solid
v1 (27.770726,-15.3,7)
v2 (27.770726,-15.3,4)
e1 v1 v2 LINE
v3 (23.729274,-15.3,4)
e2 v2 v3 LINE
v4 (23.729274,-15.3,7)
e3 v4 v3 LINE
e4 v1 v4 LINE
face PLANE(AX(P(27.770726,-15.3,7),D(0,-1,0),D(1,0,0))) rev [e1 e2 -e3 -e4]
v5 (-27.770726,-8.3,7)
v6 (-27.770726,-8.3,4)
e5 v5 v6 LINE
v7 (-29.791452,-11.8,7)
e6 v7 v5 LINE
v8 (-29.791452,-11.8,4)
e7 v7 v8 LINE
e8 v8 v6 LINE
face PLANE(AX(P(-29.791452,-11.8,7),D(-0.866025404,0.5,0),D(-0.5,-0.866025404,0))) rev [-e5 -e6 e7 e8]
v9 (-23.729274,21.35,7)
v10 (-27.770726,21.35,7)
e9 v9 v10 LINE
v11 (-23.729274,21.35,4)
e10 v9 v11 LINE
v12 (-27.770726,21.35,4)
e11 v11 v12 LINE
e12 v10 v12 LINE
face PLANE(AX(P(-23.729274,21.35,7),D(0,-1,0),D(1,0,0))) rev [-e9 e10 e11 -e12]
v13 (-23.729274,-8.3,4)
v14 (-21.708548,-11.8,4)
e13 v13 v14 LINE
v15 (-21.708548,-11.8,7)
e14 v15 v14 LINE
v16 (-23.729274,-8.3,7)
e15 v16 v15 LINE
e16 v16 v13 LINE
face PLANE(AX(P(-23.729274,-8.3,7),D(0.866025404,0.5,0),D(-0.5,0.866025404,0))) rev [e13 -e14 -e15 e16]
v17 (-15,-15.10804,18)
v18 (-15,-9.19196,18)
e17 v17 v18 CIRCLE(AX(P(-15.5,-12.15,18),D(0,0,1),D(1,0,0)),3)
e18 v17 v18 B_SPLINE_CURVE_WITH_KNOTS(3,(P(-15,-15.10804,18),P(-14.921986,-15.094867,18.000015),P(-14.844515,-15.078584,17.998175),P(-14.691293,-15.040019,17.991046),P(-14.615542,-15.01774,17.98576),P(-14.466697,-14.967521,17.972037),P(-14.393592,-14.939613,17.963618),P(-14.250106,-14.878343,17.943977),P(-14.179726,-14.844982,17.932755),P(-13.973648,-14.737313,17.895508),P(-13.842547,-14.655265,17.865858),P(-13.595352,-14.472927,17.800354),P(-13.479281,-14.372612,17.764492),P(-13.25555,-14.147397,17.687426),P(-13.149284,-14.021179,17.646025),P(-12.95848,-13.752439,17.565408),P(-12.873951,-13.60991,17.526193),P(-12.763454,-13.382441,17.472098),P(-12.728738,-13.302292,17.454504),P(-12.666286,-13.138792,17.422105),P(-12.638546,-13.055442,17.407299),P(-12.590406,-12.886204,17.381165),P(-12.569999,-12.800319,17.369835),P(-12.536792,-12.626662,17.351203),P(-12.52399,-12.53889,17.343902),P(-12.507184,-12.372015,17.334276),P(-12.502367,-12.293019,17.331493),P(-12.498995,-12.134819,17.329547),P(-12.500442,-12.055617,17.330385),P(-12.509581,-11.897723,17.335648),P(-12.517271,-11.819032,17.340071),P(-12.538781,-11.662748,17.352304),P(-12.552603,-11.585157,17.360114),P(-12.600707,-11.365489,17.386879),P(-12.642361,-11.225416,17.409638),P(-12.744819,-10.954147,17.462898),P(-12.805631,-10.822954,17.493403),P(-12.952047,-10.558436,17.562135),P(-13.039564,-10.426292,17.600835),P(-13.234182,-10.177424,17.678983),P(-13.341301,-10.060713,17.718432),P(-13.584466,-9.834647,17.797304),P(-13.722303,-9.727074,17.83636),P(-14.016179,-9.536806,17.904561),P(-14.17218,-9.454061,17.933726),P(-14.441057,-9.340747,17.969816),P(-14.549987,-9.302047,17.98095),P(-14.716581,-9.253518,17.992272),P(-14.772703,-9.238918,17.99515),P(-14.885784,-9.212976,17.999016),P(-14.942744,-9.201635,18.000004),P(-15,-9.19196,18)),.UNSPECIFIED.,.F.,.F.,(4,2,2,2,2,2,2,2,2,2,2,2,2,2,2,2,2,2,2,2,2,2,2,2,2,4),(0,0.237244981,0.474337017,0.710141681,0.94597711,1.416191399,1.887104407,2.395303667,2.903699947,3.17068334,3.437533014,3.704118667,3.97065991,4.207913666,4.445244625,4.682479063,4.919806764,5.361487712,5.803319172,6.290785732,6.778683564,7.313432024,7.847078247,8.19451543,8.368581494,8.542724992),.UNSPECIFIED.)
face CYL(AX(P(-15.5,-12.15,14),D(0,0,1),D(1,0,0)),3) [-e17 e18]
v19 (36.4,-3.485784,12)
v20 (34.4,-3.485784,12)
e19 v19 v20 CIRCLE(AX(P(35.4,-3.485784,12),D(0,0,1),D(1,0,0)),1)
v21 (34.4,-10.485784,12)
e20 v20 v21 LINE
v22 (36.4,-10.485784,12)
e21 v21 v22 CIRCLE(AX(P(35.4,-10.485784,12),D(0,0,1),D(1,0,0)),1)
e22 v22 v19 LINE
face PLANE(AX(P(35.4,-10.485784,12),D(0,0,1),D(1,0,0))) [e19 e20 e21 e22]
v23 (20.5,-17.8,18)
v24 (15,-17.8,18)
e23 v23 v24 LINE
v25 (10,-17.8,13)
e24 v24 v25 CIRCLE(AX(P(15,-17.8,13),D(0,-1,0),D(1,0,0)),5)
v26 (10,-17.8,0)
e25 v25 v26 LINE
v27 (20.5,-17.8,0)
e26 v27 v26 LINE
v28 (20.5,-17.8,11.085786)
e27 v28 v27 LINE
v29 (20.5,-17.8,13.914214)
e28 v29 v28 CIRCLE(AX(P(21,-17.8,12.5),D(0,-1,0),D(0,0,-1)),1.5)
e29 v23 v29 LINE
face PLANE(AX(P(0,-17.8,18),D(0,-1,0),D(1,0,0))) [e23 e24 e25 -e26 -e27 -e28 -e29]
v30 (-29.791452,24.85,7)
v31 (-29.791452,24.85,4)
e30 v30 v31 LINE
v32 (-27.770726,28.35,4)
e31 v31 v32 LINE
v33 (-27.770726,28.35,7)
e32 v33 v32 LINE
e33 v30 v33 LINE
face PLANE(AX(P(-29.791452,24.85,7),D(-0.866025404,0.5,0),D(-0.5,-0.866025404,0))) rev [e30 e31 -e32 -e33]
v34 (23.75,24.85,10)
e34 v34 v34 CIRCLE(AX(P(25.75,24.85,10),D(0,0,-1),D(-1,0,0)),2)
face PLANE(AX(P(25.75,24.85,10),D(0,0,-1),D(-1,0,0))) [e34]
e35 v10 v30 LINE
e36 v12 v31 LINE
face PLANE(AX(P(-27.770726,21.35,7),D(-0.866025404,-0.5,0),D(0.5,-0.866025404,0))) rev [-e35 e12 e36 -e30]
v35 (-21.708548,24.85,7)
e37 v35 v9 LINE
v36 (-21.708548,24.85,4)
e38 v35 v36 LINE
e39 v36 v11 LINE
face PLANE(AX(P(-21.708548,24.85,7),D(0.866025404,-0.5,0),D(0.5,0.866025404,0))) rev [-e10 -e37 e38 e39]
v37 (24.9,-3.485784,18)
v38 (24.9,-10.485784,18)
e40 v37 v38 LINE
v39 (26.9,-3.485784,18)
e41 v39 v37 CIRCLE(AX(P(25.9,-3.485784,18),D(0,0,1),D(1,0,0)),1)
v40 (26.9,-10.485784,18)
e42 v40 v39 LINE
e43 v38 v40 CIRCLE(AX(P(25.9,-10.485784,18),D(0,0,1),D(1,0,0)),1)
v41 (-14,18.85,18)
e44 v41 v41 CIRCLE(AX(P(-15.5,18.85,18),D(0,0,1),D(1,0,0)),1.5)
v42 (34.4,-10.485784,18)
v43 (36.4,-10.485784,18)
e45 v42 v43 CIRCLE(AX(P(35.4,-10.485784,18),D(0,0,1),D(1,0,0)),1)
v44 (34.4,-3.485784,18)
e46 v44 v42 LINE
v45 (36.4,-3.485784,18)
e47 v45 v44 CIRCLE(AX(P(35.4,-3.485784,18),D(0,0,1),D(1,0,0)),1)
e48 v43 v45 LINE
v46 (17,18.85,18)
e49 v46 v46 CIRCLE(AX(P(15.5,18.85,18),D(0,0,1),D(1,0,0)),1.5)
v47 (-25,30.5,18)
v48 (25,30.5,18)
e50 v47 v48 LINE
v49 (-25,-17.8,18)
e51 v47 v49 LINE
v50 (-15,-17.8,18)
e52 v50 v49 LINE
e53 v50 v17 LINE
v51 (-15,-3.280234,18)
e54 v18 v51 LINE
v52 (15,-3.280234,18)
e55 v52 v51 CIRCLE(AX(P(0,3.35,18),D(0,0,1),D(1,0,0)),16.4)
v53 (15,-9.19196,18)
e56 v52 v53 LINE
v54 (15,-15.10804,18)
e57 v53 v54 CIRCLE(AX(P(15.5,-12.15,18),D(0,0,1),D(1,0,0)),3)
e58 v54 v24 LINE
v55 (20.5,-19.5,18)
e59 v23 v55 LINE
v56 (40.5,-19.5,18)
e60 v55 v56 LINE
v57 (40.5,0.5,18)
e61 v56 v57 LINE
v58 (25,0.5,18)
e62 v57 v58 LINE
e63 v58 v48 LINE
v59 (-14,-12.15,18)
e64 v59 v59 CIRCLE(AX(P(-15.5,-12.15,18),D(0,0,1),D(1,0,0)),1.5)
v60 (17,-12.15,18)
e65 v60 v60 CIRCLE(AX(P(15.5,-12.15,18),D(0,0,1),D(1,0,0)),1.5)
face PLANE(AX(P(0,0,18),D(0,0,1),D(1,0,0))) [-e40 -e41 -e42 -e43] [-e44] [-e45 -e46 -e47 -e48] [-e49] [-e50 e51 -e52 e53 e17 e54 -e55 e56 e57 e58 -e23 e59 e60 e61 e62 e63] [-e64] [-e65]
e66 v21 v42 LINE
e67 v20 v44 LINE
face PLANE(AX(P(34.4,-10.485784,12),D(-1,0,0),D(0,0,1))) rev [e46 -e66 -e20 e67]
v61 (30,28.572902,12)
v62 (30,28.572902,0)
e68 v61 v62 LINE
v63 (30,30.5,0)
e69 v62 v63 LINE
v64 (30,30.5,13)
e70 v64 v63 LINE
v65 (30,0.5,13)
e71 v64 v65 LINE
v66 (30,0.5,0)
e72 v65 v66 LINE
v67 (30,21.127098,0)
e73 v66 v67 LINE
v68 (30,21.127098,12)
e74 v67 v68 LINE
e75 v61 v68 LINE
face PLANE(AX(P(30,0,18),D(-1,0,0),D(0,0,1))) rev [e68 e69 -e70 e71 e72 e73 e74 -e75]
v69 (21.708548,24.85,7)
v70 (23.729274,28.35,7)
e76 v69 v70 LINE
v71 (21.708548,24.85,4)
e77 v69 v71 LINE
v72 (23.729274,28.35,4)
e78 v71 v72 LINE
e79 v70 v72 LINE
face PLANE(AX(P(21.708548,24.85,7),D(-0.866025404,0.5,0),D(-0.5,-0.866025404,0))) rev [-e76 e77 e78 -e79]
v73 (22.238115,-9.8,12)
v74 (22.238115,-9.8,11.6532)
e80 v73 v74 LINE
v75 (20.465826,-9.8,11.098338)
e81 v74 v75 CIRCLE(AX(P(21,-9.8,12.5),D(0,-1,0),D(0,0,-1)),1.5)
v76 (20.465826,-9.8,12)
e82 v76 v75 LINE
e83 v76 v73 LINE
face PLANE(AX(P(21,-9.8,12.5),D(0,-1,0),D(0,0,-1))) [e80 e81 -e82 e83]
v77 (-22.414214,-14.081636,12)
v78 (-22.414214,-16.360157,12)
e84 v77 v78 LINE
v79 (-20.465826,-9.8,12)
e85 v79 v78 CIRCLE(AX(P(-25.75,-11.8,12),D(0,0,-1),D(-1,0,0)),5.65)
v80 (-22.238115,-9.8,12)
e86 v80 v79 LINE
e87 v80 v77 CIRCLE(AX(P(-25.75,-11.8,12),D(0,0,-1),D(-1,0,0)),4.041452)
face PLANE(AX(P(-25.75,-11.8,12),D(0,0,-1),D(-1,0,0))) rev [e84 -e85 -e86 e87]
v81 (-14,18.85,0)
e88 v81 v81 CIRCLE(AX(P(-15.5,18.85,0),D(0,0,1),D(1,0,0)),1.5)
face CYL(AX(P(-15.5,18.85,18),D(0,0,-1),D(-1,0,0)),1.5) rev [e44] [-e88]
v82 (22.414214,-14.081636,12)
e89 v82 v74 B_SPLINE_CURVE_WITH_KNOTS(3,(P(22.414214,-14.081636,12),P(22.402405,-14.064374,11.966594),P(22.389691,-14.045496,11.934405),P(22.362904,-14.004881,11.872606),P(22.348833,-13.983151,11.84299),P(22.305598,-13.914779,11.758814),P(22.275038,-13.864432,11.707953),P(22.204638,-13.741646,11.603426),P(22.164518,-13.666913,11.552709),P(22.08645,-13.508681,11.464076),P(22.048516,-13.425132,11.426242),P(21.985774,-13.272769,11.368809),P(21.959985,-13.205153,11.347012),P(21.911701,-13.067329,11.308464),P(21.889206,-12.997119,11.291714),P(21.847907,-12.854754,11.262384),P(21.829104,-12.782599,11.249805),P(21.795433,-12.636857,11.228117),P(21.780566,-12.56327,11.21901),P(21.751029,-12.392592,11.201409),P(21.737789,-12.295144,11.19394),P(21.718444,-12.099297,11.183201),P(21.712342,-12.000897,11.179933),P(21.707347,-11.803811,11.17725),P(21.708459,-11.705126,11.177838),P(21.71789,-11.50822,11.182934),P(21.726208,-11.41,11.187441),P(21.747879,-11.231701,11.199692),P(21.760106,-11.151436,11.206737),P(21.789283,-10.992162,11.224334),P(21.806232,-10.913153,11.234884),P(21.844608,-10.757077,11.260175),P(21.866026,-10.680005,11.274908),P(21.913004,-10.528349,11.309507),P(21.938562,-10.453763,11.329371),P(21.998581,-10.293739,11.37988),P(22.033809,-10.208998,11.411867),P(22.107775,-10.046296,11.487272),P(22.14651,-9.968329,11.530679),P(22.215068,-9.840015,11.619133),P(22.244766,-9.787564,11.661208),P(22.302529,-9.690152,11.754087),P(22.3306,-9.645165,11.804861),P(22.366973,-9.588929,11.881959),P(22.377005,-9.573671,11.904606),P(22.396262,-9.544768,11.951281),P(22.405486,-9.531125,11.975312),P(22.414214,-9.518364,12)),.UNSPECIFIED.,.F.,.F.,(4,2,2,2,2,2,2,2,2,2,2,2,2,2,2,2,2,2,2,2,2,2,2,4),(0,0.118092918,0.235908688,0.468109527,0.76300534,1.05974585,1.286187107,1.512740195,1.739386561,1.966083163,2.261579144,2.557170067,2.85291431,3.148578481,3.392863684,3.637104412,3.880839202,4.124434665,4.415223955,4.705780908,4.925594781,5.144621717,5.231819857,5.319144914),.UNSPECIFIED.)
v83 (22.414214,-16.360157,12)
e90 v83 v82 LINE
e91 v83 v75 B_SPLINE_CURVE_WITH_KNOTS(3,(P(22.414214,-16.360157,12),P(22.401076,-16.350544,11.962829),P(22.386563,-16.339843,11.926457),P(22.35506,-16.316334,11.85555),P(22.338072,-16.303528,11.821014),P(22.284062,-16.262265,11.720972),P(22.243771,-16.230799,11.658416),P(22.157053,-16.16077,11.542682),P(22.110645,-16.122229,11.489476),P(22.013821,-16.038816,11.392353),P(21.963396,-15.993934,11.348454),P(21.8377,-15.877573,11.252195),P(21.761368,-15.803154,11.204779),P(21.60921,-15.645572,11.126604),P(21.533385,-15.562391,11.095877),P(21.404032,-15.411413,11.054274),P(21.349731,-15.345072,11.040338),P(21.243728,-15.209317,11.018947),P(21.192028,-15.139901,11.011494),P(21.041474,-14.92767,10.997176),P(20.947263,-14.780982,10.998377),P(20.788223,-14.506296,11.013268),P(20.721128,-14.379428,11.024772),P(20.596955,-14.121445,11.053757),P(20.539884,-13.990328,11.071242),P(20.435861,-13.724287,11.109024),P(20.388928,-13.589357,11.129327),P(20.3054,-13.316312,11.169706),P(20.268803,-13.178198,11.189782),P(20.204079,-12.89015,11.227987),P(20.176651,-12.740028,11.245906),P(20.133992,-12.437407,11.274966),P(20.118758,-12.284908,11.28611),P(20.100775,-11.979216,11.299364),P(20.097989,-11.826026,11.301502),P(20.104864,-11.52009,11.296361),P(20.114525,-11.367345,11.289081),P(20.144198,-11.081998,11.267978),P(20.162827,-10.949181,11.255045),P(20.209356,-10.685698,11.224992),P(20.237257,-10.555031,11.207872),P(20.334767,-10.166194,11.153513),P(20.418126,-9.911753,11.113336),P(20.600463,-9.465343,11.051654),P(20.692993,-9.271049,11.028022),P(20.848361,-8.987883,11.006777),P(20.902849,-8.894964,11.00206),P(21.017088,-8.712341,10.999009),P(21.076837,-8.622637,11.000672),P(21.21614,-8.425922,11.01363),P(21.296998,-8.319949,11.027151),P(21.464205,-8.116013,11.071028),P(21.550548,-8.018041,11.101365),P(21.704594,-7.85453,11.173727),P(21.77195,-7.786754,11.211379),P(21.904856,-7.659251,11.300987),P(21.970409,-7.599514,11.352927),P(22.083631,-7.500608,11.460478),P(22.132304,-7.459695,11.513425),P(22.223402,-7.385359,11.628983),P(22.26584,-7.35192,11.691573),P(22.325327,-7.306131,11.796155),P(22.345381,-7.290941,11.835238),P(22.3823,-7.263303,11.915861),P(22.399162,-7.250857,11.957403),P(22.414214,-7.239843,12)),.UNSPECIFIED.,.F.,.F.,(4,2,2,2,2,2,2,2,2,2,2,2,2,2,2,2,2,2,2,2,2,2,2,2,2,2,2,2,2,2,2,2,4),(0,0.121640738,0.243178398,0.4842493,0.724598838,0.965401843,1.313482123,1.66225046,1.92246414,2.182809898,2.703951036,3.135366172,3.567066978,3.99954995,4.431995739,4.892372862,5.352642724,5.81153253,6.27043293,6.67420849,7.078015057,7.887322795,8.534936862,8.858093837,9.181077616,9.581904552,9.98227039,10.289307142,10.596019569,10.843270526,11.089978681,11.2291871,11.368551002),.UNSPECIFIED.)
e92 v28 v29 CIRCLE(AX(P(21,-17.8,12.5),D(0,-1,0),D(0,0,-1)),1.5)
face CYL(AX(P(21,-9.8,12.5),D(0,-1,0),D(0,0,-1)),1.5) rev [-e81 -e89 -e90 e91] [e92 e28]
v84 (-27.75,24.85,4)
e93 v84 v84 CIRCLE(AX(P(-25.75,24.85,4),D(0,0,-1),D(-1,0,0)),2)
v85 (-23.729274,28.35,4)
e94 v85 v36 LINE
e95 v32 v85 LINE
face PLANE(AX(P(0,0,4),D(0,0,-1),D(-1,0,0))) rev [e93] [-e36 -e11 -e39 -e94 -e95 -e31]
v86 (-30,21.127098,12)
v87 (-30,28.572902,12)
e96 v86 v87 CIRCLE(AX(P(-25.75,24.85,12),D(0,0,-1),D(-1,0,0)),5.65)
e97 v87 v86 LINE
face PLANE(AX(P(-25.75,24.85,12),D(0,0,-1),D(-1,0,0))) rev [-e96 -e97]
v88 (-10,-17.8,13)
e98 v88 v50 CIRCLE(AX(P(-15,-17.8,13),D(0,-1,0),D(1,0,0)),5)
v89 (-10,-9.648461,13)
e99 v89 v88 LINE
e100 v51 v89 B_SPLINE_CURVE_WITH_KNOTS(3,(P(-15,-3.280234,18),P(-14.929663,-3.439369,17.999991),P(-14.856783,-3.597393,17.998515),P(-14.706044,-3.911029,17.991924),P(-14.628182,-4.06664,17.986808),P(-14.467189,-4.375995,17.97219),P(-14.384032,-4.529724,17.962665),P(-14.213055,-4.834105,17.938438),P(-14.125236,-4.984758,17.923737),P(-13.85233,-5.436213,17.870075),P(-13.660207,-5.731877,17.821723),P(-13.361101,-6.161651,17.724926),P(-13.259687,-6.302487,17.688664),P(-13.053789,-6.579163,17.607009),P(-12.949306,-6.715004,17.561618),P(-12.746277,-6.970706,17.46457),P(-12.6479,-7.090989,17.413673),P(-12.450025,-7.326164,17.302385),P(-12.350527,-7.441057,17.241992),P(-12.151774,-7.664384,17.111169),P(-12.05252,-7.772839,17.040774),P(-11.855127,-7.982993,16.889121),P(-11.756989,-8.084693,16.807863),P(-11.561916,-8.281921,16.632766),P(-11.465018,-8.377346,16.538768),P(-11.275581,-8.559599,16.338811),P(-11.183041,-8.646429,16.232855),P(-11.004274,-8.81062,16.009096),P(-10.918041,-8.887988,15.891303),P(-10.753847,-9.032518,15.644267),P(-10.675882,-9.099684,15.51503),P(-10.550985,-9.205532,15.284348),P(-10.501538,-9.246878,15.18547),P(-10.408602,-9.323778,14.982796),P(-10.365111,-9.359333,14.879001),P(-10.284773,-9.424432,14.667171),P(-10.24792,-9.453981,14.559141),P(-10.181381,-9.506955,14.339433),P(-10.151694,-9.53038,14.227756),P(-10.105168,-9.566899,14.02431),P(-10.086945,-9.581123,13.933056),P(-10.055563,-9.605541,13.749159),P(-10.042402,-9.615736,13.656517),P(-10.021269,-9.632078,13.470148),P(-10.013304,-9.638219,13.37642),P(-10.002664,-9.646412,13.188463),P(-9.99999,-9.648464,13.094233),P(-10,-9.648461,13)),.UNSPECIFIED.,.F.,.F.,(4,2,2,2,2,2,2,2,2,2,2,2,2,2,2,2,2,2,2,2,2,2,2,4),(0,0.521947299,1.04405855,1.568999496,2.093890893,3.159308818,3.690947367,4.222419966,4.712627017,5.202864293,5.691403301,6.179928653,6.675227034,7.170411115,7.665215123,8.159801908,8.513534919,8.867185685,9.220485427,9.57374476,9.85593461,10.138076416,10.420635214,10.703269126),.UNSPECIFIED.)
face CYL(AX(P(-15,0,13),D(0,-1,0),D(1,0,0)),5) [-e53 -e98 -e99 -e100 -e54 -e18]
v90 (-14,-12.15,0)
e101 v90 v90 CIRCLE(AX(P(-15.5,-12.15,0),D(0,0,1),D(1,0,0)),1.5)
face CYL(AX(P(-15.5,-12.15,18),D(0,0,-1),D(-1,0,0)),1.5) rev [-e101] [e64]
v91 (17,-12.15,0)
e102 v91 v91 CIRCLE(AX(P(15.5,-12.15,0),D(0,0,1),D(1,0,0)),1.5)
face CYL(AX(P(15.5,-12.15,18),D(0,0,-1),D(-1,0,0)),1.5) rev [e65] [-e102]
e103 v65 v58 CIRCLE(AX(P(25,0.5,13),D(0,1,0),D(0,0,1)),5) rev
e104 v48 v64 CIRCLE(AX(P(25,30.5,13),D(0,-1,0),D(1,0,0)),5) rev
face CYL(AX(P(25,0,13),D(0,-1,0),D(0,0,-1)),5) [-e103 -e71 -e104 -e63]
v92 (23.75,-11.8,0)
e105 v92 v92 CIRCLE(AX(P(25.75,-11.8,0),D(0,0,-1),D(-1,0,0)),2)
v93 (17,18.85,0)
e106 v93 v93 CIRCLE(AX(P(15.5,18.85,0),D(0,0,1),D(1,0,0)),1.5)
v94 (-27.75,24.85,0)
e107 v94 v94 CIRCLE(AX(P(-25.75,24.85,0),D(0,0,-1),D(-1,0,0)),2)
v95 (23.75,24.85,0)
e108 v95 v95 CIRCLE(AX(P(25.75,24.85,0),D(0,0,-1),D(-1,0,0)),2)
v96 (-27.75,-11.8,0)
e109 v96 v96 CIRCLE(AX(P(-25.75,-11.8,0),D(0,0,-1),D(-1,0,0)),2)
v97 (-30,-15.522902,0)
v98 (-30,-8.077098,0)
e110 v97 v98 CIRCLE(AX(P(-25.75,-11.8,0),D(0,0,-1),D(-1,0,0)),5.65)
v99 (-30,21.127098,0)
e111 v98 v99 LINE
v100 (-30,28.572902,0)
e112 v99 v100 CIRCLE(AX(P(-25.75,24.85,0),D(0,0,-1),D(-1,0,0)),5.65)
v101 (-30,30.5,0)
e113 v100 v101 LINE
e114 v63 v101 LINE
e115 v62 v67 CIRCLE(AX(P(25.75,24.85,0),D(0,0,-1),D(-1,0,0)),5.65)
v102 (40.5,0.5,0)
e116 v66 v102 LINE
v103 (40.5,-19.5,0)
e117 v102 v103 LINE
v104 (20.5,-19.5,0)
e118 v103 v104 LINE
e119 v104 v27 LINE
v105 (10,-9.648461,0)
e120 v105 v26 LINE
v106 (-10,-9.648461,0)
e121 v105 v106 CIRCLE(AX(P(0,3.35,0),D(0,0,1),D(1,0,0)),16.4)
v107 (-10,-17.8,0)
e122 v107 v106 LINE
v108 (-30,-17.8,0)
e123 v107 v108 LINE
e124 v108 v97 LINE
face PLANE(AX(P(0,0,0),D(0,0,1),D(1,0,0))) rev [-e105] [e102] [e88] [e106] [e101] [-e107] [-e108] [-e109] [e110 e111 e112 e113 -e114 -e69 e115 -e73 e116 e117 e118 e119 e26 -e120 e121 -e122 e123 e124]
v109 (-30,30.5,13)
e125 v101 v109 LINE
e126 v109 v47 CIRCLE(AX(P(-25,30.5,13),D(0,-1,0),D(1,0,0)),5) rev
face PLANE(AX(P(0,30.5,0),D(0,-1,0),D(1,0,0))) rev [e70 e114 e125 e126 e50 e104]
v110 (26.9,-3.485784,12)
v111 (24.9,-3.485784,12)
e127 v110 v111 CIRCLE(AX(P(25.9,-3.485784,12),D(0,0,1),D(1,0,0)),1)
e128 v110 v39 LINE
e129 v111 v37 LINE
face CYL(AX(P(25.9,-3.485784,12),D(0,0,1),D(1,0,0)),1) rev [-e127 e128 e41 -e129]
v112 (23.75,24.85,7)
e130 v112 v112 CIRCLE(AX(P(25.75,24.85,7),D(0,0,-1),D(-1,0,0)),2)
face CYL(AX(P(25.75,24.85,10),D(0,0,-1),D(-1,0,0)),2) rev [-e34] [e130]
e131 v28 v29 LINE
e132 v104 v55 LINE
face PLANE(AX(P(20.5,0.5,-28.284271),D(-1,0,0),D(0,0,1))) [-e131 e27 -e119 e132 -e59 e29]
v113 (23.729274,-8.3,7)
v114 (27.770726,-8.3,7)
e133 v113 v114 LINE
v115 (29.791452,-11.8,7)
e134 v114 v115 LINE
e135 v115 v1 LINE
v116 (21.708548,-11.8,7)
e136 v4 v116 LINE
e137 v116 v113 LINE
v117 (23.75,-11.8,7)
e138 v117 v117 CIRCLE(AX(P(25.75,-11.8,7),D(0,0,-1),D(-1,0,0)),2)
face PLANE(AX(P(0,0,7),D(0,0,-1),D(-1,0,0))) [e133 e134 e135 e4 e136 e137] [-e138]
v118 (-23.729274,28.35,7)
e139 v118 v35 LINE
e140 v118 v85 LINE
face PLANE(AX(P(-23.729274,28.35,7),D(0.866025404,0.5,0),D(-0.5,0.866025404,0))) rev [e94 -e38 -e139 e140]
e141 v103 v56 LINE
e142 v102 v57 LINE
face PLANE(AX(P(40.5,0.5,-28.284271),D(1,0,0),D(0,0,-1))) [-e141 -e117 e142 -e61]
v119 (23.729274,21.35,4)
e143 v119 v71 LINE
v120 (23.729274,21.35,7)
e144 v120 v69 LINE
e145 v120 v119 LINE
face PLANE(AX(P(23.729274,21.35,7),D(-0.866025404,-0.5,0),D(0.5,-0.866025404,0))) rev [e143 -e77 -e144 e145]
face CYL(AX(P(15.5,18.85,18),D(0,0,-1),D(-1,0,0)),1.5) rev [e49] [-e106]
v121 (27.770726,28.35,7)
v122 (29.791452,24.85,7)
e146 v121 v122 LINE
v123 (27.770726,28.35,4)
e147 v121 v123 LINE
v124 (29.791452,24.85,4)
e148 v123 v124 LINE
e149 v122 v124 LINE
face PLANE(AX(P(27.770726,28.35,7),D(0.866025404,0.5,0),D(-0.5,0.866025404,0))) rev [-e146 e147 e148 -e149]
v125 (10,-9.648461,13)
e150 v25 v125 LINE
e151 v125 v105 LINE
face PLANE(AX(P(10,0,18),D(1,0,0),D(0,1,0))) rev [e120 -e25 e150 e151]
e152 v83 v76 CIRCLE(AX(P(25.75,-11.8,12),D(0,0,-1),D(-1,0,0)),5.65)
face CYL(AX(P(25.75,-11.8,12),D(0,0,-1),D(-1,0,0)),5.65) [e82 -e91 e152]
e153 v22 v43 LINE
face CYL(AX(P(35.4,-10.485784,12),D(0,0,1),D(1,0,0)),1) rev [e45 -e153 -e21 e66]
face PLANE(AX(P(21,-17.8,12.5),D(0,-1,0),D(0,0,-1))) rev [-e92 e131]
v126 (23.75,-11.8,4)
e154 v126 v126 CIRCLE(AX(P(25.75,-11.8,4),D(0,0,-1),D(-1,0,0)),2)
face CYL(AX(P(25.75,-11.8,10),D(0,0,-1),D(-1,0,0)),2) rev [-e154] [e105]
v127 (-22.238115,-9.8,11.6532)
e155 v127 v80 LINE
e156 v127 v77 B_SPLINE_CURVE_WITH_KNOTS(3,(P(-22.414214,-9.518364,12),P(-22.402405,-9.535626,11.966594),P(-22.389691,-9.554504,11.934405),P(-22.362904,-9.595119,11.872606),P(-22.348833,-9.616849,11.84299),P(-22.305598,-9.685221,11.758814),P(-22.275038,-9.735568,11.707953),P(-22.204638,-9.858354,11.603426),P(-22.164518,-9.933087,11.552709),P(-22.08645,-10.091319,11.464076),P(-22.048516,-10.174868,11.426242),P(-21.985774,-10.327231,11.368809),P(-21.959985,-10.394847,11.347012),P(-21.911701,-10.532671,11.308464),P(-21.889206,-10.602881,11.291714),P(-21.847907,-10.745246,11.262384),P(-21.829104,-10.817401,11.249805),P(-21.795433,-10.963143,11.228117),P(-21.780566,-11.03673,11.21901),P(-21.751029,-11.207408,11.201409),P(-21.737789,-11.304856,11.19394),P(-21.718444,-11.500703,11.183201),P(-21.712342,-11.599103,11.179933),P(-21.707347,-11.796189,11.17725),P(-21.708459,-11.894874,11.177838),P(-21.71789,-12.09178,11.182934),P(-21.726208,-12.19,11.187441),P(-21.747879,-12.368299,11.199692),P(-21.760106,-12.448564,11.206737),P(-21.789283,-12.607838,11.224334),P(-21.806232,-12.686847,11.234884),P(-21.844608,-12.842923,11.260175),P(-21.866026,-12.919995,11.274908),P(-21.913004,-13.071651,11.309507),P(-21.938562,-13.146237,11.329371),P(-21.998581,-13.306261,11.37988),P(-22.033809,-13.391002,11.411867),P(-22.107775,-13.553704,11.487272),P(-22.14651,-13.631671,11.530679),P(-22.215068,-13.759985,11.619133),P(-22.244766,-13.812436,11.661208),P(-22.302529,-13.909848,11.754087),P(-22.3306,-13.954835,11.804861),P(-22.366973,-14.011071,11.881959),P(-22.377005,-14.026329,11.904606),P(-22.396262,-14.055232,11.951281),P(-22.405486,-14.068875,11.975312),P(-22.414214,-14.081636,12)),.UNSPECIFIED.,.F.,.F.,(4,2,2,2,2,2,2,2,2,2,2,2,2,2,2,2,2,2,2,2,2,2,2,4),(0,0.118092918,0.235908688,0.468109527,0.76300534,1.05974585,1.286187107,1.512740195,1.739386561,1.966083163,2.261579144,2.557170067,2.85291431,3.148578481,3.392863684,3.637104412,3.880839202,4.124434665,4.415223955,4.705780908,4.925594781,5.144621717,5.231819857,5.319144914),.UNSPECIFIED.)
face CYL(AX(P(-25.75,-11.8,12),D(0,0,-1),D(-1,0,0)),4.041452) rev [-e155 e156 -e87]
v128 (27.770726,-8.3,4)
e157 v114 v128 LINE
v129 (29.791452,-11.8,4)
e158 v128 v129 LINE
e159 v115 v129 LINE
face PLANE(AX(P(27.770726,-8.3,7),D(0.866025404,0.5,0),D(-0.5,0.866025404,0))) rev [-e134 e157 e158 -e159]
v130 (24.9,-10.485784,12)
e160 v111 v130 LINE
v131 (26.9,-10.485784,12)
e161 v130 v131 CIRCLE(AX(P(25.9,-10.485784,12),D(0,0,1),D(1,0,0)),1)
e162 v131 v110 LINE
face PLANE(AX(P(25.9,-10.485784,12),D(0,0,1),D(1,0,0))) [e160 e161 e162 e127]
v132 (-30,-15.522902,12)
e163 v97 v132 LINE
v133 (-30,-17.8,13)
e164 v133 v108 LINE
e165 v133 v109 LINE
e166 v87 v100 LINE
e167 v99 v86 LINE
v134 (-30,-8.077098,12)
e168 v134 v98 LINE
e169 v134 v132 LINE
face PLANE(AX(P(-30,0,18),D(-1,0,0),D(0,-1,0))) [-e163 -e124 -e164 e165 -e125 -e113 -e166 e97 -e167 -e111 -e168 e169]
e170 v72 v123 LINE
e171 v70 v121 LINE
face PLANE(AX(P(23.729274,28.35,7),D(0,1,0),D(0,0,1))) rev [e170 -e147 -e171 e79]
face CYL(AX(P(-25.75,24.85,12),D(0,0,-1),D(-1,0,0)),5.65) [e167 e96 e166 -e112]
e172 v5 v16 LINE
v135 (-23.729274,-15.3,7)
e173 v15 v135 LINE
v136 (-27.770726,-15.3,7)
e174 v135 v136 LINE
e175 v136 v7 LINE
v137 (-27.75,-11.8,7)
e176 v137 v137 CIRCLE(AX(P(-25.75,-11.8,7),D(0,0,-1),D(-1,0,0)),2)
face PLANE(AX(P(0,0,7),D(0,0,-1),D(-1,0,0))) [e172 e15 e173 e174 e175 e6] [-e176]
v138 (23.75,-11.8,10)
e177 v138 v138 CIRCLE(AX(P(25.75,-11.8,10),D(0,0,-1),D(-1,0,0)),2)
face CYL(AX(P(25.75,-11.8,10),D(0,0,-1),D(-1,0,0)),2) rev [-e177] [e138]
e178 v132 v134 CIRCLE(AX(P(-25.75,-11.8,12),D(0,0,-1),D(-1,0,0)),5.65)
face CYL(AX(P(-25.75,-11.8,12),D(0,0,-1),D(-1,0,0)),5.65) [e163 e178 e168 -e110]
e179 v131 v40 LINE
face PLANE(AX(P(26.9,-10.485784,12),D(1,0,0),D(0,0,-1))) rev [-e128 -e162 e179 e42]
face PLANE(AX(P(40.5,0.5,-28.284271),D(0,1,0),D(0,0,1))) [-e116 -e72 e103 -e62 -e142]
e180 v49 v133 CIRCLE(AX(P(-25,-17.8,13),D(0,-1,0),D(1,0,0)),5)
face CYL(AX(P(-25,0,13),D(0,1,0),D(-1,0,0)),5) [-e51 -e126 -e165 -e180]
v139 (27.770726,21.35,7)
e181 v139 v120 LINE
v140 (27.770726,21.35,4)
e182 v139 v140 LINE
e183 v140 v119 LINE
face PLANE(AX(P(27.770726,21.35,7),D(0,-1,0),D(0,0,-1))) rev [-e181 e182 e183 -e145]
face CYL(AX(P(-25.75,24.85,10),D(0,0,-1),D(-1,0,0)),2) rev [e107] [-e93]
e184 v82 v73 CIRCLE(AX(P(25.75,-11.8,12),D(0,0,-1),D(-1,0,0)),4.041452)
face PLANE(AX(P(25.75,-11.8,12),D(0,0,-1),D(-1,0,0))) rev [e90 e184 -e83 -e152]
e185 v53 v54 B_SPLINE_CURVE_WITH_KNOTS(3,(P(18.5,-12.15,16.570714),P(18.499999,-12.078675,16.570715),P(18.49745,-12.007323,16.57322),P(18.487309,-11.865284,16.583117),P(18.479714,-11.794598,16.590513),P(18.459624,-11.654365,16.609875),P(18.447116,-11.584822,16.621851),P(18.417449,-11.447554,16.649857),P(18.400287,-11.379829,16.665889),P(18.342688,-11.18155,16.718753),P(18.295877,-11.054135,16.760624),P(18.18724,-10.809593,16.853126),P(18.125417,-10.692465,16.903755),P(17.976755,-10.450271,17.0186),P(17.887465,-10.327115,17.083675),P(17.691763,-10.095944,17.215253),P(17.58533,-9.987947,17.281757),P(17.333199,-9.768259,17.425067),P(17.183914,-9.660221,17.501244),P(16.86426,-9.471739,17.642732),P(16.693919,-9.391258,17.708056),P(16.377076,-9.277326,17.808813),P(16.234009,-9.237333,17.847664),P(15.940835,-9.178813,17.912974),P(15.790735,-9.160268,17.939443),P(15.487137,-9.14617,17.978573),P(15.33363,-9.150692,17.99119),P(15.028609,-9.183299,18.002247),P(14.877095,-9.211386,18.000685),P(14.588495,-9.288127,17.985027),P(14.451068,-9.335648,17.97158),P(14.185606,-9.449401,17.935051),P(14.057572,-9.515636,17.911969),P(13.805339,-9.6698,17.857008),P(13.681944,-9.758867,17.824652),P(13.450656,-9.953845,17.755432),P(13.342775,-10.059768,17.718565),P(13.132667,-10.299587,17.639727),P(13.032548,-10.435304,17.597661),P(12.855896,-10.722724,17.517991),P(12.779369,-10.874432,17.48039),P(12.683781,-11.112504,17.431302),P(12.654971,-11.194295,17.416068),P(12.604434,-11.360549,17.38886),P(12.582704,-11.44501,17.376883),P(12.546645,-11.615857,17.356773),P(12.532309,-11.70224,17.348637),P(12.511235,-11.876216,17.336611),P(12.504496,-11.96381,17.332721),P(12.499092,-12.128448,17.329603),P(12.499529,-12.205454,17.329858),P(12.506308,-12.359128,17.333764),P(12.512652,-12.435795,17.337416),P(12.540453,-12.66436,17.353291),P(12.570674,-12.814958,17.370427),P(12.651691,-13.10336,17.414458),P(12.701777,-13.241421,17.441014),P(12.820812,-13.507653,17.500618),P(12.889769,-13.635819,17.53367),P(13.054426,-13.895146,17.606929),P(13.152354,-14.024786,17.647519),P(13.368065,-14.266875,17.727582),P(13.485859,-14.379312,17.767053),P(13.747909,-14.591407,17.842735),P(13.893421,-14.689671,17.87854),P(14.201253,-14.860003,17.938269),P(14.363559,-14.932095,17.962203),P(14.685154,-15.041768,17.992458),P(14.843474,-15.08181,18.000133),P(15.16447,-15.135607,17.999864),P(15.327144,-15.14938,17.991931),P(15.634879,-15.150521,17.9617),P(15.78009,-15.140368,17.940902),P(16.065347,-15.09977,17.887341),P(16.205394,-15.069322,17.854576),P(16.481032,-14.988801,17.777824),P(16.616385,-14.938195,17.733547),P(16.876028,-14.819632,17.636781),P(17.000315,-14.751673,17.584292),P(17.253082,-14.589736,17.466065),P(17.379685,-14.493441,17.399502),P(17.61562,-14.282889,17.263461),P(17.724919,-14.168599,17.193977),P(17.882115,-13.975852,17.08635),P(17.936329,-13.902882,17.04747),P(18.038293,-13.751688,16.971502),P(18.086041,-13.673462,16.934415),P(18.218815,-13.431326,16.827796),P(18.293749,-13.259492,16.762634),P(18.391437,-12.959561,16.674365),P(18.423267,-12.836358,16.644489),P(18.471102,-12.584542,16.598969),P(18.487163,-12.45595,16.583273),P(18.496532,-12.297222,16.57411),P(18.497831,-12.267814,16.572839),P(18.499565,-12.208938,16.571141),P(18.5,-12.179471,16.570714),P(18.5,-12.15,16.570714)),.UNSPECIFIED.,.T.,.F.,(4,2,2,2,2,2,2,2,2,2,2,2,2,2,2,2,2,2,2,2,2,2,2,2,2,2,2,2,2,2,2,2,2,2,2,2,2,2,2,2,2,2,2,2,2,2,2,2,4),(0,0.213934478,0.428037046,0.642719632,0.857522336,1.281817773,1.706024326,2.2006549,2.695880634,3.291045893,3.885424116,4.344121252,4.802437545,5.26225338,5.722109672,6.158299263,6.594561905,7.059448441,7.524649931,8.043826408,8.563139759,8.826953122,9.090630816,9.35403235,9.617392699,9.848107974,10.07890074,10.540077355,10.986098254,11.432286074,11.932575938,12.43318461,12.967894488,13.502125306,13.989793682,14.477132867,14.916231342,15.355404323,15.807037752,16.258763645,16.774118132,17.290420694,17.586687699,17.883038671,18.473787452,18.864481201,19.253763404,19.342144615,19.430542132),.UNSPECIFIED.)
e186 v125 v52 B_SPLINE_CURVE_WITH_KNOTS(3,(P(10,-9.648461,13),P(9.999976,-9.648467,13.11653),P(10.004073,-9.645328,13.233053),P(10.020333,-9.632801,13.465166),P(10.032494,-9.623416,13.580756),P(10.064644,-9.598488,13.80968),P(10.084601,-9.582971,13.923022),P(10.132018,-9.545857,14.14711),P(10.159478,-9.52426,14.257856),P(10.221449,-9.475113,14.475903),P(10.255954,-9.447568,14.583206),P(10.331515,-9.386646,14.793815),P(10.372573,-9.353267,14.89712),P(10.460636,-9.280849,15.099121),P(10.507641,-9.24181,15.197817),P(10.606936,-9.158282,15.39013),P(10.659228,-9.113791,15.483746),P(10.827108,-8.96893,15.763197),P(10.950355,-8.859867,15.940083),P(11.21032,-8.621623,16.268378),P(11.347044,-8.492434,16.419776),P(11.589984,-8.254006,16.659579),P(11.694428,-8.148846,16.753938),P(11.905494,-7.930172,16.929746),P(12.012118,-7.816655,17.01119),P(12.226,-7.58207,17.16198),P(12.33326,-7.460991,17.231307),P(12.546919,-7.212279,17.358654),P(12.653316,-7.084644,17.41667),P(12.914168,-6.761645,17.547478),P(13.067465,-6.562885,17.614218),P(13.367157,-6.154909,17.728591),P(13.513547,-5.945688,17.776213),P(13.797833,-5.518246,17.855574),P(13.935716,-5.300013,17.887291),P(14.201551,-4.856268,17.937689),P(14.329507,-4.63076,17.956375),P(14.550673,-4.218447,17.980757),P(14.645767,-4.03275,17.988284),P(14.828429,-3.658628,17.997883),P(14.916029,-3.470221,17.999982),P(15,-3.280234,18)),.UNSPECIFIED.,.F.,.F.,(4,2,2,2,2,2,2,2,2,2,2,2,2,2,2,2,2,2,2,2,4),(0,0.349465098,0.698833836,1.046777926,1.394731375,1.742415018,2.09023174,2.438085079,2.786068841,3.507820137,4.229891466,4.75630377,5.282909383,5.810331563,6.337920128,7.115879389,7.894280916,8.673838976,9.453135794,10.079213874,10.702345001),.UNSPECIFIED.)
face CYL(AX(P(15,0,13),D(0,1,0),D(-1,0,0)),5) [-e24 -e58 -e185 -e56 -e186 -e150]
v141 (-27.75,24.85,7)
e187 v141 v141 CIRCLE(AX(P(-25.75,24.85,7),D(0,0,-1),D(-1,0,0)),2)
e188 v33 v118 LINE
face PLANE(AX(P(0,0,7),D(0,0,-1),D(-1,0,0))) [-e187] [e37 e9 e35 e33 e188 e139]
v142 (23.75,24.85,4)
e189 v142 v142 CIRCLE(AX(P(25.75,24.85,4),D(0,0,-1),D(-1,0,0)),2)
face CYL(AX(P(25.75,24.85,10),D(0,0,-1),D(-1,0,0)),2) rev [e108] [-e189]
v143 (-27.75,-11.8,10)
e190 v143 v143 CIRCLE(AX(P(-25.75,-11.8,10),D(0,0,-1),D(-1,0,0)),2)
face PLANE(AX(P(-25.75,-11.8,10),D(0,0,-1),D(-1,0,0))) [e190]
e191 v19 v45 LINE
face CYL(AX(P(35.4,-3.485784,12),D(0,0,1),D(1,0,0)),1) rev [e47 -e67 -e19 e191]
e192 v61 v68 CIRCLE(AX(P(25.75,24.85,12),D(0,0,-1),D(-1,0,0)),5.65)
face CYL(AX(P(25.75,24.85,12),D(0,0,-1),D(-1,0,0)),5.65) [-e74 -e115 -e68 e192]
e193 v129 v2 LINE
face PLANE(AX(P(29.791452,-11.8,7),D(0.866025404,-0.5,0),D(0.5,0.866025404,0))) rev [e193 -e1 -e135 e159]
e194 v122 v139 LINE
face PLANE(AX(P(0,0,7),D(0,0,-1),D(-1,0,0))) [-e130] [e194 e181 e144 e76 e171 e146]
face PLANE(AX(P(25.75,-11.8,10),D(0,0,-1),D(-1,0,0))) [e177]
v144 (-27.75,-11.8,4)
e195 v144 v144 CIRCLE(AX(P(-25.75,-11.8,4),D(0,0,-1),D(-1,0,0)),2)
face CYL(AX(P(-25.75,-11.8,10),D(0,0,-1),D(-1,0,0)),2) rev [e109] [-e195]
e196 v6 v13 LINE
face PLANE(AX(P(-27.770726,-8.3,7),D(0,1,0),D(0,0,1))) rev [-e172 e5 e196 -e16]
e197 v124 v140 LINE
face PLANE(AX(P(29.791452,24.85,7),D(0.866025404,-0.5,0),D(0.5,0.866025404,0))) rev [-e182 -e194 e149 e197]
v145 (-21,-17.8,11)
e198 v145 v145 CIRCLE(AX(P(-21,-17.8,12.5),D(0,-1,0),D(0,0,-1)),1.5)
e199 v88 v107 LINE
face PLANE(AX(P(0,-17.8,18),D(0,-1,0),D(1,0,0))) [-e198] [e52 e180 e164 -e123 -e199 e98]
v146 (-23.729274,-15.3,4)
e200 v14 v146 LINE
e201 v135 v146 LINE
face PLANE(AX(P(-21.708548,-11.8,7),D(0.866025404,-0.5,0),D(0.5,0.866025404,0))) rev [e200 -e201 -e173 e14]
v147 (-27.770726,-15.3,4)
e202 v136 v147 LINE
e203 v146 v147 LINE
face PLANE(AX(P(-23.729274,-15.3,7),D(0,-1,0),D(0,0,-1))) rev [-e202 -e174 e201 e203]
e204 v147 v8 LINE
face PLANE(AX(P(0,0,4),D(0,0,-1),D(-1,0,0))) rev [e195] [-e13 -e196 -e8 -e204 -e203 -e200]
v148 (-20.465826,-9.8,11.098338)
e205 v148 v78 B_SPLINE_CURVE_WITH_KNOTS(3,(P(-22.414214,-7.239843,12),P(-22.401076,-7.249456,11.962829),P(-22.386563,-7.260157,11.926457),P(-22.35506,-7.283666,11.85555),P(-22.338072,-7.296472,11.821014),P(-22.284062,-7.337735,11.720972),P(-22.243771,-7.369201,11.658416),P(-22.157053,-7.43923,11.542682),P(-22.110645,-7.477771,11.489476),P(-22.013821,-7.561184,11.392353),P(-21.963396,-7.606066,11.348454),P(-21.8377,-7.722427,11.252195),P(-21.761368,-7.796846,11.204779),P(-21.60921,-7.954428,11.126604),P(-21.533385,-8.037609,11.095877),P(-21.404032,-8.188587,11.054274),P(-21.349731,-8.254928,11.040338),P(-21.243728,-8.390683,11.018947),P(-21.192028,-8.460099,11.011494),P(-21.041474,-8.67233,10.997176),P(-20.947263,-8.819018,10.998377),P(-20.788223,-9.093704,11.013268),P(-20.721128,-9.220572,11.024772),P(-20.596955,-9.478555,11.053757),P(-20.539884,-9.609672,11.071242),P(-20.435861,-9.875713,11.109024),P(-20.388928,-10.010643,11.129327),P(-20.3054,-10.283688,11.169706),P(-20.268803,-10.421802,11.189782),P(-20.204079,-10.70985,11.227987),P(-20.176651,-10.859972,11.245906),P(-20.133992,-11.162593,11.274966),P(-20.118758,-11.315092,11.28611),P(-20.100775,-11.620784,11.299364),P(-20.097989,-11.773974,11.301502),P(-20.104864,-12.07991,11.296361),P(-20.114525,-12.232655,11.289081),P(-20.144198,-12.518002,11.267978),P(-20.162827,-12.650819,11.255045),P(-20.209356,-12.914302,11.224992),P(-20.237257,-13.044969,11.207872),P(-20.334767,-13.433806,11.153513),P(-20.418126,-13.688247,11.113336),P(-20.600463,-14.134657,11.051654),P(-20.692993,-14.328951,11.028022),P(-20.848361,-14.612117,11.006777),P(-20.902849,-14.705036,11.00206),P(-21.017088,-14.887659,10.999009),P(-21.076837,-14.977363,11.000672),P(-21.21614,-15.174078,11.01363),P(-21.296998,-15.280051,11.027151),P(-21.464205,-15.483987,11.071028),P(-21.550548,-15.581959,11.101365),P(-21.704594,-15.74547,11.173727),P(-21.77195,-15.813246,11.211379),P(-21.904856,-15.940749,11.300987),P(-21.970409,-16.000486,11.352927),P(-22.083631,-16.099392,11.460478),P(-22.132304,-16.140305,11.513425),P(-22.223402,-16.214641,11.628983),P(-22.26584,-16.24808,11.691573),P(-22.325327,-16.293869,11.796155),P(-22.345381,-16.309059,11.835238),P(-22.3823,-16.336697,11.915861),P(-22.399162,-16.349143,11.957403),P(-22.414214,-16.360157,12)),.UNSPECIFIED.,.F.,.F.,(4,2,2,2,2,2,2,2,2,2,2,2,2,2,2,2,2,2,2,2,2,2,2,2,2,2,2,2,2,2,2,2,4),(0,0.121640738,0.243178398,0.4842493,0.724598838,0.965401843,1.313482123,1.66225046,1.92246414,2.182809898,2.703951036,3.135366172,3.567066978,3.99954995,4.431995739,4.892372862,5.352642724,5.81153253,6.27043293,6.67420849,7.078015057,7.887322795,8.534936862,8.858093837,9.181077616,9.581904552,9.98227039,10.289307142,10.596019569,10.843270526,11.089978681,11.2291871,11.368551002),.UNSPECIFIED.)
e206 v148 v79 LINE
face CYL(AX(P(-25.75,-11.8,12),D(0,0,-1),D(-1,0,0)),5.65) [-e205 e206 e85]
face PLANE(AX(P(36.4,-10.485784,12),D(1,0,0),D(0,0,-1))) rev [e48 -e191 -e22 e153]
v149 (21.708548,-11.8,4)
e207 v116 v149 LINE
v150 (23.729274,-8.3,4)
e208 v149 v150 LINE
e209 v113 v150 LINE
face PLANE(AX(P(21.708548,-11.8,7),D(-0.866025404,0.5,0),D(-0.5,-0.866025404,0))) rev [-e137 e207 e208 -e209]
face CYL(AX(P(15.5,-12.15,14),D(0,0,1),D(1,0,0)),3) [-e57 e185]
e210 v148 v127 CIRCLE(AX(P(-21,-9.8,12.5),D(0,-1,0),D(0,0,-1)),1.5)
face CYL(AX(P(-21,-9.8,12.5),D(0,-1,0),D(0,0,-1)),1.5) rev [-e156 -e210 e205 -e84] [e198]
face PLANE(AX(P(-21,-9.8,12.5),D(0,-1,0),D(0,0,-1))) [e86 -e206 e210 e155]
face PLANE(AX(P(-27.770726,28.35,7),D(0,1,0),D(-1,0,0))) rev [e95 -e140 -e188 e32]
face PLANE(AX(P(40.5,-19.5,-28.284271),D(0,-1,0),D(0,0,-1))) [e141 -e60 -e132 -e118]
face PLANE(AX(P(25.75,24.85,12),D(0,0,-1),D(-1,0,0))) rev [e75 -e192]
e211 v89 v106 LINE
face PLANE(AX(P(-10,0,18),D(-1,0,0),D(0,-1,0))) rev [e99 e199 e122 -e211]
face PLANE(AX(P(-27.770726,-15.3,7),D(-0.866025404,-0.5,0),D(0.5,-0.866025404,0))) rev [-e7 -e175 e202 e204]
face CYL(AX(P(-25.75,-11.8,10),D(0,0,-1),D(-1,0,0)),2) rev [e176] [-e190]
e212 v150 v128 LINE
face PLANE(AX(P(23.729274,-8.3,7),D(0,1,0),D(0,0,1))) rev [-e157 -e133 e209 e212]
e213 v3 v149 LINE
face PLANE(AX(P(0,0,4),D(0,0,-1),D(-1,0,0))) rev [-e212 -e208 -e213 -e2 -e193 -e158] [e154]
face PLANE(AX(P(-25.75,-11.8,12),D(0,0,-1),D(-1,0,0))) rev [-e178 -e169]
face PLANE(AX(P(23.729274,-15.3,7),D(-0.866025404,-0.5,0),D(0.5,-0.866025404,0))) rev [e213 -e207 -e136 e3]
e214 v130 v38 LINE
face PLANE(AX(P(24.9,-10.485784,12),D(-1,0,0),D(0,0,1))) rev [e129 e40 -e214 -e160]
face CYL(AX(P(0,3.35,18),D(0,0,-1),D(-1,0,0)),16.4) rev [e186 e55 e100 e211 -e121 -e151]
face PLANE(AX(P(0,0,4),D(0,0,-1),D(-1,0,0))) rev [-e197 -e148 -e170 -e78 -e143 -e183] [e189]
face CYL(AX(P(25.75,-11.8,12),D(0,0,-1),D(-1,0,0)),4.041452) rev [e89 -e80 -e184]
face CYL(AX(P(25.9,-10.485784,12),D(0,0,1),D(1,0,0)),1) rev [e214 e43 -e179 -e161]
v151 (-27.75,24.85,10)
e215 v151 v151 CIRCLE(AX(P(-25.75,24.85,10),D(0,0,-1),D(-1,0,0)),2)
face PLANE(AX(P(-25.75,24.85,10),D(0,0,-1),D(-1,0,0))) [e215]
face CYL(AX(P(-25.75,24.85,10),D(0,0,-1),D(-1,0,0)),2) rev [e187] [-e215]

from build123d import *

# Parameters (mm, degrees)
SKETCH_1_R          = 1.5
EXTRUDE_1_DEPTH     = 18
SKETCH_9_W          = 60
SKETCH_9_H          = 18
EXTRUDE_4_DEPTH     = 6
FILLET_1_R          = 5
EXTRUDE_START       = -4
SKETCH_2_R          = 3
SKETCH_2_R_2        = 1.5
EXTRUDE_2_DEPTH     = 4
SKETCH_3_R          = 1.5
CUT_EXTRUDE_1_DEPTH = 8
EXTRUDE_3_REACH     = 48.414
SKETCH_5_W          = 20
SKETCH_5_H          = 20
SKETCH_6_R          = 1.5
CUT_EXTRUDE_6_DEPTH = 8
CUT_EXTRUDE_7_DEPTH = 6
CUT_EXTRUDE_START   = -4
CUT_EXTRUDE_8_DEPTH = 3
SKETCH_10_R         = 5.65
SKETCH_10_R_2       = 4.041451884
EXTRUDE_5_DEPTH     = 12
SKETCH_11_R         = 2
CUT_EXTRUDE_9_DEPTH = 10


with BuildPart() as part:
    # Эскиз1 → Бобышка-Вытянуть1 (new body)
    with BuildSketch(Plane.XY):
        with BuildLine():
            Line((10, -17.8), (30, -17.8))
            Line((30, -17.8), (30, 24.5))
            Line((30, 24.5), (-30, 24.5))
            Line((-30, 24.5), (-30, -17.8))
            Line((-30, -17.8), (-10, -17.8))
            Line((-10, -17.8), (-10, -9.648461447))
            ThreePointArc((-10, -9.648461447), (0, 19.75), (10, -9.648461447))
            Line((10, -9.648461447), (10, -17.8))
        make_face()
        with Locations((-15.5, -12.15)):
            Circle(SKETCH_1_R, mode=Mode.SUBTRACT)
        with Locations((15.5, -12.15)):
            Circle(SKETCH_1_R, mode=Mode.SUBTRACT)
        with Locations((-15.5, 18.85)):
            Circle(SKETCH_1_R, mode=Mode.SUBTRACT)
        with Locations((15.5, 18.85)):
            Circle(SKETCH_1_R, mode=Mode.SUBTRACT)
    extrude(amount=EXTRUDE_1_DEPTH)

    # Эскиз9 → Бобышка-Вытянуть4 (add)
    with BuildSketch(Plane(origin=(0, 24.5, 0), x_dir=(1, 0, 0), z_dir=(0, 1, 0))):
        with Locations((0, -9)):
            Rectangle(SKETCH_9_W, SKETCH_9_H)
    extrude(amount=EXTRUDE_4_DEPTH)

    # Скругление1
    # the kernel refuses this fillet: 5 mm, written as the material it takes off along each edge
    with BuildSketch(Plane(origin=(10, 2.851538553, 18), x_dir=(1, 0, 0), z_dir=(0, -1, 0)), Plane(origin=(-10, -30.3, 18), x_dir=(-1, 0, 0), z_dir=(0, 1, 0))) as fillet_1_piece_1:
        with BuildLine():
            CenterArc((FILLET_1_R, -FILLET_1_R), FILLET_1_R, 90, 90)
            Line((0, -FILLET_1_R), (0, 0))
            Line((0, 0), (FILLET_1_R, 0))
        make_face()
    extrude(amount=33.151538553, mode=Mode.SUBTRACT)
    with BuildSketch(Plane(origin=(30, -30.3, 18), x_dir=(-1, 0, 0), z_dir=(0, 1, 0)), Plane(origin=(-30, 43, 18), x_dir=(1, 0, 0), z_dir=(0, -1, 0))) as fillet_1_piece_2:
        with BuildLine():
            CenterArc((FILLET_1_R, -FILLET_1_R), FILLET_1_R, 90, 90)
            Line((0, -FILLET_1_R), (0, 0))
            Line((0, 0), (FILLET_1_R, 0))
        make_face()
    extrude(amount=73.3, mode=Mode.SUBTRACT)

    # Эскиз2 → Бобышка-Вытянуть2 (add)
    # profile 1 of 2: a face of its own
    with BuildSketch(Plane.XY.offset(18).offset(EXTRUDE_START)):
        with Locations((-15.5, -12.15)):
            Circle(SKETCH_2_R)
        with Locations((-15.5, -12.15)):
            Circle(SKETCH_2_R_2, mode=Mode.SUBTRACT)
    # profile 2 of 2: a face of its own
    with BuildSketch(Plane.XY.offset(18).offset(EXTRUDE_START)):
        with Locations((15.5, -12.15)):
            Circle(SKETCH_2_R)
        with Locations((15.5, -12.15)):
            Circle(SKETCH_2_R_2, mode=Mode.SUBTRACT)
    extrude(amount=EXTRUDE_2_DEPTH)

    # Эскиз3 → Вырез-Вытянуть1 (cut)
    with BuildSketch(Plane.XZ.offset(17.8)):
        with Locations(Location((-21, 12.5, 0), (0, 0, 270))):
            Circle(SKETCH_3_R)
        with Locations(Location((21, 12.5, 0), (0, 0, 270))):
            Circle(SKETCH_3_R)
    extrude(amount=-CUT_EXTRUDE_1_DEPTH, mode=Mode.SUBTRACT)

    # Бобышка-Вытянуть3: up to this face of the body (flat: up to its plane)
    extrude_3_end = Plane(part.part.faces().sort_by_distance((0, 20.520252556, 0))[0])
    # Эскиз5 → Бобышка-Вытянуть3 (add, up to the picked face)
    with BuildSketch(Plane.XY.offset(18), mode=Mode.PRIVATE) as extrude_3_sk1:
        with Locations((30.5, -9.5)):
            Rectangle(SKETCH_5_W, SKETCH_5_H)
    extrude_3_tool1 = split(extrude(extrude_3_sk1.sketch, amount=-EXTRUDE_3_REACH, mode=Mode.PRIVATE), bisect_by=extrude_3_end, keep=Keep.BOTH, mode=Mode.PRIVATE)
    add(extrude_3_tool1.solids().sort_by(Axis((30.5, -9.5, 18), (0, 0, -1)))[0])

    # Эскиз6 → Вырез-Вытянуть6 (cut)
    with BuildSketch(Plane.XZ.offset(17.8)):
        with Locations(Location((21, 12.5, 0), (0, 0, 270))):
            Circle(SKETCH_6_R)
    extrude(amount=-CUT_EXTRUDE_6_DEPTH, mode=Mode.SUBTRACT)

    # Эскиз7 → Вырез-Вытянуть7 (cut)
    with BuildSketch(Plane.XY.offset(18)):
        with BuildLine():
            Line((24.9, -10.485784196), (24.9, -3.485784196))
            ThreePointArc((24.9, -3.485784196), (25.9, -2.485784196), (26.9, -3.485784196))
            Line((26.9, -3.485784196), (26.9, -10.485784196))
            ThreePointArc((26.9, -10.485784196), (25.9, -11.485784196), (24.9, -10.485784196))
        make_face()
        with BuildLine():
            Line((34.4, -10.485784196), (34.4, -3.485784196))
            ThreePointArc((34.4, -3.485784196), (35.4, -2.485784196), (36.4, -3.485784196))
            Line((36.4, -3.485784196), (36.4, -10.485784196))
            ThreePointArc((36.4, -10.485784196), (35.4, -11.485784196), (34.4, -10.485784196))
        make_face()
    extrude(amount=-CUT_EXTRUDE_7_DEPTH, mode=Mode.SUBTRACT)

    # Эскиз8 → Вырез-Вытянуть8 (cut)
    with BuildSketch(Plane(origin=(0, 0, 0), x_dir=(-1, 0, 0), z_dir=(0, 0, -1)).offset(CUT_EXTRUDE_START)):
        Polygon((29.791451884, -11.8), (27.770725942, -8.3), (23.729274058, -8.3), (21.708548116, -11.8), (23.729274058, -15.3), (27.770725942, -15.3), align=None)
        Polygon((-21.708548116, -11.8), (-23.729274058, -8.3), (-27.770725942, -8.3), (-29.791451884, -11.8), (-27.770725942, -15.3), (-23.729274058, -15.3), align=None)
        Polygon((-21.708548116, 24.85), (-23.729274058, 28.35), (-27.770725942, 28.35), (-29.791451884, 24.85), (-27.770725942, 21.35), (-23.729274058, 21.35), align=None)
        Polygon((29.791451884, 24.85), (27.770725942, 28.35), (23.729274058, 28.35), (21.708548116, 24.85), (23.729274058, 21.35), (27.770725942, 21.35), align=None)
    extrude(amount=-CUT_EXTRUDE_8_DEPTH, mode=Mode.SUBTRACT)

    # Эскиз10 → Бобышка-Вытянуть5 (add)
    # profile 1 of 4: a face of its own
    with BuildSketch(Plane(origin=(0, 0, 0), x_dir=(-1, 0, 0), z_dir=(0, 0, -1))):
        with Locations((25.75, -11.8)):
            Circle(SKETCH_10_R)
        with Locations((25.75, -11.8)):
            Circle(SKETCH_10_R_2, mode=Mode.SUBTRACT)
    # profile 2 of 4: a face of its own
    with BuildSketch(Plane(origin=(0, 0, 0), x_dir=(-1, 0, 0), z_dir=(0, 0, -1))):
        with Locations((25.75, 24.85)):
            Circle(SKETCH_10_R)
        with Locations((25.75, 24.85)):
            Circle(SKETCH_10_R_2, mode=Mode.SUBTRACT)
    # profile 3 of 4: a face of its own
    with BuildSketch(Plane(origin=(0, 0, 0), x_dir=(-1, 0, 0), z_dir=(0, 0, -1))):
        with Locations((-25.75, 24.85)):
            Circle(SKETCH_10_R)
        with Locations((-25.75, 24.85)):
            Circle(SKETCH_10_R_2, mode=Mode.SUBTRACT)
    # profile 4 of 4: a face of its own
    with BuildSketch(Plane(origin=(0, 0, 0), x_dir=(-1, 0, 0), z_dir=(0, 0, -1))):
        with Locations((-25.75, -11.8)):
            Circle(SKETCH_10_R)
        with Locations((-25.75, -11.8)):
            Circle(SKETCH_10_R_2, mode=Mode.SUBTRACT)
    extrude(amount=-EXTRUDE_5_DEPTH)

    # Эскиз11 → Вырез-Вытянуть9 (cut)
    with BuildSketch(Plane(origin=(0, 0, 0), x_dir=(-1, 0, 0), z_dir=(0, 0, -1))):
        with Locations((-25.75, 24.85)):
            Circle(SKETCH_11_R)
        with Locations((25.75, 24.85)):
            Circle(SKETCH_11_R)
        with Locations((25.75, -11.8)):
            Circle(SKETCH_11_R)
        with Locations((-25.75, -11.8)):
            Circle(SKETCH_11_R)
    extrude(amount=-CUT_EXTRUDE_9_DEPTH, mode=Mode.SUBTRACT)


solid = part.part
